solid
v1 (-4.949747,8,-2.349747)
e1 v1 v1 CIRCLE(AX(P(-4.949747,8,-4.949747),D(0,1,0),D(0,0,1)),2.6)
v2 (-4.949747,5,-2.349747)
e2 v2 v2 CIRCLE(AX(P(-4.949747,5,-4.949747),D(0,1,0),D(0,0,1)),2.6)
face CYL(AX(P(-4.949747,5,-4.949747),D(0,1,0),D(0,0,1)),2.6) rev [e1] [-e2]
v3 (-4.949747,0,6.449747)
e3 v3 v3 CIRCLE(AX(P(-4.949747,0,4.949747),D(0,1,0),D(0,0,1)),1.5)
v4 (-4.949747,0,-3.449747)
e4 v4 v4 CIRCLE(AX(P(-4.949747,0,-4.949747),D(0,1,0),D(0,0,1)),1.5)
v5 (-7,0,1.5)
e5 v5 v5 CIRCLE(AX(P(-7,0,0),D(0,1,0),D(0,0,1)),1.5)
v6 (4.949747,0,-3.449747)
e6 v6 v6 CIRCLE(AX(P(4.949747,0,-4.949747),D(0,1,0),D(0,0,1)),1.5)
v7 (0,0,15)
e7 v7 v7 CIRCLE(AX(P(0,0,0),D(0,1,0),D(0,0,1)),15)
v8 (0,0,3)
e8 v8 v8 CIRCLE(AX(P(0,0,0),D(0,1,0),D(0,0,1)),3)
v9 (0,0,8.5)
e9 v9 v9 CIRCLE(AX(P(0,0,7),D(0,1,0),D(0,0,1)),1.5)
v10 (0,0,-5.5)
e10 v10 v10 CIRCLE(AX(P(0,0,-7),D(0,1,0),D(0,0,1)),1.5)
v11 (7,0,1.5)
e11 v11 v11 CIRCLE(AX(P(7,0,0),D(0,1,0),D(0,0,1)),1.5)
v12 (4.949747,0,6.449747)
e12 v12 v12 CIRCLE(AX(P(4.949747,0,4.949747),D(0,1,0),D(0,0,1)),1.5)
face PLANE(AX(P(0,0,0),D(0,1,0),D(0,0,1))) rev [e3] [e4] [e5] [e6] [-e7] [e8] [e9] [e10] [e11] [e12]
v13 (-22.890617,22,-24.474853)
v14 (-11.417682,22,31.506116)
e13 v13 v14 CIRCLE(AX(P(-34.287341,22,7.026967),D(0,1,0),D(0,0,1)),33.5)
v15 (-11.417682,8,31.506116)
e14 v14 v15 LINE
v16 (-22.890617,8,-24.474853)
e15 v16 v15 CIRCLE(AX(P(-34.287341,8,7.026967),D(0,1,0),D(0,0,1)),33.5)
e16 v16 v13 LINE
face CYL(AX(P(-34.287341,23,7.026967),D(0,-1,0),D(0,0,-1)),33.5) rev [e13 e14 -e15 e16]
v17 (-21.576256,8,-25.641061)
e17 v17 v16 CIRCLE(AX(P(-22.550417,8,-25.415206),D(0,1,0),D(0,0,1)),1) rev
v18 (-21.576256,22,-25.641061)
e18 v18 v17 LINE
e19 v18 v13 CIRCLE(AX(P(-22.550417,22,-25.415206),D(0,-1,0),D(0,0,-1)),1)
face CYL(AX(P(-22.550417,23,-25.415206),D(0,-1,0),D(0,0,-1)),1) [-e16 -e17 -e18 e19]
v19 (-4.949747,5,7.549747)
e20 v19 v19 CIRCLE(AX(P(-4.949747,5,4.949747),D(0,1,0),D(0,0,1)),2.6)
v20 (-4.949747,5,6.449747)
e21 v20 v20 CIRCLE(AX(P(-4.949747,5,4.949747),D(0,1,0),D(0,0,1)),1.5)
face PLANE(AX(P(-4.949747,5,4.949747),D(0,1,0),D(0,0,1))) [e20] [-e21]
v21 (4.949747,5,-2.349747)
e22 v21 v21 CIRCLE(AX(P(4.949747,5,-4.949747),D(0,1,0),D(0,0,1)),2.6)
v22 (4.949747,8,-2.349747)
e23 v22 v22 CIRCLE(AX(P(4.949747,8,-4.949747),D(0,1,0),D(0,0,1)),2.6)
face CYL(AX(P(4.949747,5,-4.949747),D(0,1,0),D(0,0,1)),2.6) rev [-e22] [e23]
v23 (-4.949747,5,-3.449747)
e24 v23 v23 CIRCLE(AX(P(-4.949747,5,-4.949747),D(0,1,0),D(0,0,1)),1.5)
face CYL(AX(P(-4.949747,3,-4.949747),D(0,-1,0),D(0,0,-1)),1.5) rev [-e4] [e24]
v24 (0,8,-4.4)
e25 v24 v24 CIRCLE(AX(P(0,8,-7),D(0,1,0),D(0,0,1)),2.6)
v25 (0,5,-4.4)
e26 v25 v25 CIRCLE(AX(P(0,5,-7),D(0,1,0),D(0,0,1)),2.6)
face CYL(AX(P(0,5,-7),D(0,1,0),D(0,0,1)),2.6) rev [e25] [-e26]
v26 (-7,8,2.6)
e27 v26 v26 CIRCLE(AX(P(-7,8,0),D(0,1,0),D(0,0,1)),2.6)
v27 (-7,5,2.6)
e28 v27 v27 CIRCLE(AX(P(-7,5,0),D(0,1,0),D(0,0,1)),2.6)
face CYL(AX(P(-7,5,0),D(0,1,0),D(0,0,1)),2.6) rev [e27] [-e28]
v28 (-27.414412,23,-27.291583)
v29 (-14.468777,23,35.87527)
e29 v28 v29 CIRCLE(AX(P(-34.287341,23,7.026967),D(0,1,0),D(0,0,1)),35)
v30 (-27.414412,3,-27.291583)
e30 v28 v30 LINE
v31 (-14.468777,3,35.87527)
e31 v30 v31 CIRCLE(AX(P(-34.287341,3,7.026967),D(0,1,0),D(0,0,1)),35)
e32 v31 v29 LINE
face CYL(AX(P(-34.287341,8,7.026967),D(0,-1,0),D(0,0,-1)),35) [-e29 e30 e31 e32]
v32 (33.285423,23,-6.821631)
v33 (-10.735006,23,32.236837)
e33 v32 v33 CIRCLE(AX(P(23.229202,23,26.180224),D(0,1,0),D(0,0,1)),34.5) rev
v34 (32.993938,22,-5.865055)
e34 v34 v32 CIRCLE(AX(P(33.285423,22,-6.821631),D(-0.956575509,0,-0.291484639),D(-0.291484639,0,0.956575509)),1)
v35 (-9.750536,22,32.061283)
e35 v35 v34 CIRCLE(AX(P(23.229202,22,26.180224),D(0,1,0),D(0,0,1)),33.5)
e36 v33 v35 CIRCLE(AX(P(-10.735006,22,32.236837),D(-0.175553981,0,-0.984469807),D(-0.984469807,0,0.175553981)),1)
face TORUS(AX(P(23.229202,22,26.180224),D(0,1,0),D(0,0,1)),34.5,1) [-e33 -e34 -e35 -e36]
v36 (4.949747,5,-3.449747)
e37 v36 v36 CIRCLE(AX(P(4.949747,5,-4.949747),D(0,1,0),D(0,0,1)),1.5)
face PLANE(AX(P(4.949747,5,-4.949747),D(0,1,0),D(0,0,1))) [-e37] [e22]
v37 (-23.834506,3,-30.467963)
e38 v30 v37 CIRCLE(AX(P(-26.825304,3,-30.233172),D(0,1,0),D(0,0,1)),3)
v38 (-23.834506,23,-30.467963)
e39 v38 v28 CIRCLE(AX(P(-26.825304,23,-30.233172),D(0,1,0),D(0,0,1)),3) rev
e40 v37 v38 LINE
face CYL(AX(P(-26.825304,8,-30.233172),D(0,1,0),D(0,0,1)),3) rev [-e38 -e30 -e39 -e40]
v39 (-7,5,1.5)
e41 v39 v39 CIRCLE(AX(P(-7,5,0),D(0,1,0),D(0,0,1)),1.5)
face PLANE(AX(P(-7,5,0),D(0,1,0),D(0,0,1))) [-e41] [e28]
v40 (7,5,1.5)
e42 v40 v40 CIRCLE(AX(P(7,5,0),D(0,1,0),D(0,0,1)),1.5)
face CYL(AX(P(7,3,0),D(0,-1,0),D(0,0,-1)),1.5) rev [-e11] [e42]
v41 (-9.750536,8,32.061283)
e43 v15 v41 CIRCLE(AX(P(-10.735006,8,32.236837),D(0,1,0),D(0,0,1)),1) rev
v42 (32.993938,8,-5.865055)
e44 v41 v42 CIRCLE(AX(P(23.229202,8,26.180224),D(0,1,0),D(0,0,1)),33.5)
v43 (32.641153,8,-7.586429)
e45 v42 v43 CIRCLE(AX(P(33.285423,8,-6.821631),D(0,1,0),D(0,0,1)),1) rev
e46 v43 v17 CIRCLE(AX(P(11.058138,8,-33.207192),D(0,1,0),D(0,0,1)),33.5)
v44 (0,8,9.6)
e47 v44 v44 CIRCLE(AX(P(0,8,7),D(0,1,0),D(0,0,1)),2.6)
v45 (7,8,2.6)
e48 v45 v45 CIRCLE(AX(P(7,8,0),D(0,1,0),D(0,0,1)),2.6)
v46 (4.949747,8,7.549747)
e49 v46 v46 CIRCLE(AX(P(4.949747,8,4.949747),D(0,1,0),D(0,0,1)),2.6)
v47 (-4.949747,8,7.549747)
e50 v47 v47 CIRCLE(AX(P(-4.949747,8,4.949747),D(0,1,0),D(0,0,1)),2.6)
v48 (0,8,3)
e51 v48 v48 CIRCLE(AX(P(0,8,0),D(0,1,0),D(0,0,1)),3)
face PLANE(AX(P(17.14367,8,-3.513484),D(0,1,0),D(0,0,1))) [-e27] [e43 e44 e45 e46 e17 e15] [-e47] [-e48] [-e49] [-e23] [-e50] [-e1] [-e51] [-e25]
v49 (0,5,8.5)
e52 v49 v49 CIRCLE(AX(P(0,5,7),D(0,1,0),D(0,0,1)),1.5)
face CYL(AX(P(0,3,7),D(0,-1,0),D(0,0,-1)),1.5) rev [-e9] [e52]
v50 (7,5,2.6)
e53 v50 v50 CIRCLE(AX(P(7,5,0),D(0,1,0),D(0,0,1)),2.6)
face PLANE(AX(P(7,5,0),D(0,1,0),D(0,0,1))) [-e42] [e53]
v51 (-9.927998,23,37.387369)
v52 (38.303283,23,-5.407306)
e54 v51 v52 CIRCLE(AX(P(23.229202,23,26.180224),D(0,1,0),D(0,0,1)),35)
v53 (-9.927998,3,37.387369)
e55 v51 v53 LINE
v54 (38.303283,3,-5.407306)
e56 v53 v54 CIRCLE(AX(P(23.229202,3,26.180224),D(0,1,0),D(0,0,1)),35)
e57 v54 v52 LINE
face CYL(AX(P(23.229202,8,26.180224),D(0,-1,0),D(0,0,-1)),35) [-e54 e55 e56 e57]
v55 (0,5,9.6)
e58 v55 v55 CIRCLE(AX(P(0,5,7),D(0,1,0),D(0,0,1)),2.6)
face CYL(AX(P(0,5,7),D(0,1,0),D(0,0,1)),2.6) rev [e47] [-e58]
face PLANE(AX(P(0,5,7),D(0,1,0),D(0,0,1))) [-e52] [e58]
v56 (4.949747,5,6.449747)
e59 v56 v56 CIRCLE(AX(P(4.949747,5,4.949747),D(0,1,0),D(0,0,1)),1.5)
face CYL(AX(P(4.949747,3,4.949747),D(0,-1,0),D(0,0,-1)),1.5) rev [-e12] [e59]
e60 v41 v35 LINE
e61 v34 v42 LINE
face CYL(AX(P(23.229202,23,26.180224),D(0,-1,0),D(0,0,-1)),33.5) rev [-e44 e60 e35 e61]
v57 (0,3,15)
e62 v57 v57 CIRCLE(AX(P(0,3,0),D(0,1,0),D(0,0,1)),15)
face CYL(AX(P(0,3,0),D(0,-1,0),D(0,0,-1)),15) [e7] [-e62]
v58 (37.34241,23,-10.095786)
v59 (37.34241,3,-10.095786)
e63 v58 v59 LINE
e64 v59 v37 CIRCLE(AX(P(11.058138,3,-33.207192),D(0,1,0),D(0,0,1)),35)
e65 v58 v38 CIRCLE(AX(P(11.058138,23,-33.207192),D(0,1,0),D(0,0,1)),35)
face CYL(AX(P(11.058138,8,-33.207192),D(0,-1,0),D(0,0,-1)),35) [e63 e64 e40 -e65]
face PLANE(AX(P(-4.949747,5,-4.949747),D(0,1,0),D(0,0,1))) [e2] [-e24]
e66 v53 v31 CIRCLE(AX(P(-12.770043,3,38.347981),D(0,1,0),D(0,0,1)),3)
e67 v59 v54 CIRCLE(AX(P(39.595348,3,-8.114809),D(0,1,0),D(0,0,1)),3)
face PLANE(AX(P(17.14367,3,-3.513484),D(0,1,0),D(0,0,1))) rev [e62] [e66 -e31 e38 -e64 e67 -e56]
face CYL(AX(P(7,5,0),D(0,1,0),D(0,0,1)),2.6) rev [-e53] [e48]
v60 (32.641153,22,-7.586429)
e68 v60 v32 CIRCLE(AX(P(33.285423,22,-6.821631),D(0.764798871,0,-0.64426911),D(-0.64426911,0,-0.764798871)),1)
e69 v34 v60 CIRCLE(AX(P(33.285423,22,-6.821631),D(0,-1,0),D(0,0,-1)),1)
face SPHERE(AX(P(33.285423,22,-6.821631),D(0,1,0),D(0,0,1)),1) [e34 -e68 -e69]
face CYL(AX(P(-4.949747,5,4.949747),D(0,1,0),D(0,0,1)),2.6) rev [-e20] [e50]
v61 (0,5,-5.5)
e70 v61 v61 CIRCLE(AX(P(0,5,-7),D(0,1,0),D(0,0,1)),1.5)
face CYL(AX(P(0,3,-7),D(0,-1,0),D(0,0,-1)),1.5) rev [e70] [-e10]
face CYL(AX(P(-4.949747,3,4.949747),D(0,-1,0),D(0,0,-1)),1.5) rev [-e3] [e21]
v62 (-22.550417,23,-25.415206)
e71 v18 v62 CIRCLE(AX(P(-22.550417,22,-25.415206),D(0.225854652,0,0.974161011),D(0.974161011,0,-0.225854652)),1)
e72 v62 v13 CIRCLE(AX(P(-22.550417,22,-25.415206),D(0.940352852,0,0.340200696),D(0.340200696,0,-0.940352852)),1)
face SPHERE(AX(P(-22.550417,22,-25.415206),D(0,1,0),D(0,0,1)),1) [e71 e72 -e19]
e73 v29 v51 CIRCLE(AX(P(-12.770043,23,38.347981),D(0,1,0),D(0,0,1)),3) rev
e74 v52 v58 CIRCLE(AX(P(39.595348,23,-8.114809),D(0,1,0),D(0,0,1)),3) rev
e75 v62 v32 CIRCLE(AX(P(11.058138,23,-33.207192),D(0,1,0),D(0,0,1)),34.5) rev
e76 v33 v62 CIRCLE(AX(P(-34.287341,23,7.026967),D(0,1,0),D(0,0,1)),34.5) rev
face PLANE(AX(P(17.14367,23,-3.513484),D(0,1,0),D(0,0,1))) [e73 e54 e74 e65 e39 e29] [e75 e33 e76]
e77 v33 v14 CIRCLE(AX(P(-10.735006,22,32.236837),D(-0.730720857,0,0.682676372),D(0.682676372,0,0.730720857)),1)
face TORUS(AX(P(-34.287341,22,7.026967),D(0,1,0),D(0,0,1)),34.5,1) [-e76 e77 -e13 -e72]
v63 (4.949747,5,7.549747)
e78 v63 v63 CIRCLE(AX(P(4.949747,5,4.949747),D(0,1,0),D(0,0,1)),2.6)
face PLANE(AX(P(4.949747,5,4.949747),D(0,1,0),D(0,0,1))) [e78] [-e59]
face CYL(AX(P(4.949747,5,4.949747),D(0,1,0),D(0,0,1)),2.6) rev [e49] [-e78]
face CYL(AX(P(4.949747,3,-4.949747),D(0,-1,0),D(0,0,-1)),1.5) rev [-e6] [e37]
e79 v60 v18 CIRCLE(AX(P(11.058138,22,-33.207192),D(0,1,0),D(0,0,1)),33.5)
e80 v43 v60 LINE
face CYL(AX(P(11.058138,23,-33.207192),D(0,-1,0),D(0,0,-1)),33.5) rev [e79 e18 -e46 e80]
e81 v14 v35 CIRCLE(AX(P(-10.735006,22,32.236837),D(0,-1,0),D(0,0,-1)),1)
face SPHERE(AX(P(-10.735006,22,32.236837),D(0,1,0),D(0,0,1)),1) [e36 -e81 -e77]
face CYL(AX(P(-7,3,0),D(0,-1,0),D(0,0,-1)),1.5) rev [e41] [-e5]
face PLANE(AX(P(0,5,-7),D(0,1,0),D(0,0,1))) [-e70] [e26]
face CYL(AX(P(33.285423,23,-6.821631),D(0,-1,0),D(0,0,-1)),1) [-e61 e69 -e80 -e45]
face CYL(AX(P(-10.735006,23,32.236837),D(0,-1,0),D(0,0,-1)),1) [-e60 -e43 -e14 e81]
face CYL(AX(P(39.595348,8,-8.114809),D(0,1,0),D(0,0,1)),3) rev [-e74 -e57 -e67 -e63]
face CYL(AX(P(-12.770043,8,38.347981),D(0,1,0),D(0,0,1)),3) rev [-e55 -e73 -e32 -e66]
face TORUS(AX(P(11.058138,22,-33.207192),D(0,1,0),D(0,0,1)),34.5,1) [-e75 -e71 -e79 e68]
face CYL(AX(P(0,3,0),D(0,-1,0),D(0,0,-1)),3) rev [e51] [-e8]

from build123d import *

# Parameters (mm, degrees)
SKETCH_1_R          = 15
SKETCH_1_R_2        = 1.5
SKETCH_1_R_3        = 3
EXTRUDE_1_DEPTH     = 3
SKETCH_2_R          = 1.5
SKETCH_2_R_2        = 3
EXTRUDE_2_DEPTH     = 5
SKETCH_5_R          = 2.6
CUT_EXTRUDE_1_DEPTH = 3
EXTRUDE_3_DEPTH     = 15
FILLET_5_R          = 1
FILLET_6_R          = 1
FILLET_7_R          = 3


with BuildPart() as part:
    # 草图1 → 凸台-拉伸1 (new body)
    with BuildSketch(Plane(origin=(0, 0, 0), x_dir=(1, 0, 0), z_dir=(0, 1, 0))):
        with Locations(Location((0, 0, 0), (0, 0, 270))):
            Circle(SKETCH_1_R)
        with Locations(Location((0, 7, 0), (0, 0, 270))):
            Circle(SKETCH_1_R_2, mode=Mode.SUBTRACT)
        with Locations(Location((4.949747468, 4.949747468, 0), (0, 0, 270))):
            Circle(SKETCH_1_R_2, mode=Mode.SUBTRACT)
        with Locations(Location((7, 0, 0), (0, 0, 270))):
            Circle(SKETCH_1_R_2, mode=Mode.SUBTRACT)
        with Locations(Location((4.949747468, -4.949747468, 0), (0, 0, 270))):
            Circle(SKETCH_1_R_2, mode=Mode.SUBTRACT)
        with Locations(Location((0, -7, 0), (0, 0, 270))):
            Circle(SKETCH_1_R_2, mode=Mode.SUBTRACT)
        with Locations(Location((-4.949747468, -4.949747468, 0), (0, 0, 270))):
            Circle(SKETCH_1_R_2, mode=Mode.SUBTRACT)
        with Locations(Location((-7, 0, 0), (0, 0, 270))):
            Circle(SKETCH_1_R_2, mode=Mode.SUBTRACT)
        with Locations(Location((-4.949747468, 4.949747468, 0), (0, 0, 270))):
            Circle(SKETCH_1_R_2, mode=Mode.SUBTRACT)
        with Locations(Location((0, 0, 0), (0, 0, 270))):
            Circle(SKETCH_1_R_3, mode=Mode.SUBTRACT)
    extrude(amount=EXTRUDE_1_DEPTH)

    # 草图2 → 凸台-拉伸2 (add)
    with BuildSketch(Plane(origin=(0, 3, 0), x_dir=(1, 0, 0), z_dir=(0, 1, 0))):
        with BuildLine():
            ThreePointArc((34.287340692, 7.026967216), (22.116276452, 66.414383351), (-23.229202466, 26.18022446))
            ThreePointArc((-23.229202466, 26.18022446), (-68.574681385, -14.053934431), (-11.058138226, -33.207191676))
            ThreePointArc((-11.058138226, -33.207191676), (46.458404933, -52.36044892), (34.287340692, 7.026967216))
        make_face()
        with Locations(Location((-4.949747468, 4.949747468, 0), (0, 0, 270))):
            Circle(SKETCH_2_R, mode=Mode.SUBTRACT)
        with Locations(Location((-4.949747468, -4.949747468, 0), (0, 0, 270))):
            Circle(SKETCH_2_R, mode=Mode.SUBTRACT)
        with Locations(Location((0, -7, 0), (0, 0, 270))):
            Circle(SKETCH_2_R, mode=Mode.SUBTRACT)
        with Locations(Location((0, 0, 0), (0, 0, 270))):
            Circle(SKETCH_2_R_2, mode=Mode.SUBTRACT)
        with Locations(Location((-7, 0, 0), (0, 0, 270))):
            Circle(SKETCH_2_R, mode=Mode.SUBTRACT)
        with Locations(Location((4.949747468, -4.949747468, 0), (0, 0, 270))):
            Circle(SKETCH_2_R, mode=Mode.SUBTRACT)
        with Locations(Location((7, 0, 0), (0, 0, 270))):
            Circle(SKETCH_2_R, mode=Mode.SUBTRACT)
        with Locations(Location((4.949747468, 4.949747468, 0), (0, 0, 270))):
            Circle(SKETCH_2_R, mode=Mode.SUBTRACT)
        with Locations(Location((0, 7, 0), (0, 0, 270))):
            Circle(SKETCH_2_R, mode=Mode.SUBTRACT)
    extrude(amount=EXTRUDE_2_DEPTH)

    # 草图5 → 切除-拉伸1 (cut)
    with BuildSketch(Plane(origin=(0, 8, 0), x_dir=(1, 0, 0), z_dir=(0, 1, 0))):
        with Locations(Location((0, 7, 0), (0, 0, 270))):
            Circle(SKETCH_5_R)
        with Locations(Location((4.949747468, 4.949747468, 0), (0, 0, 270))):
            Circle(SKETCH_5_R)
        with Locations(Location((7, 0, 0), (0, 0, 270))):
            Circle(SKETCH_5_R)
        with Locations(Location((4.949747468, -4.949747468, 0), (0, 0, 270))):
            Circle(SKETCH_5_R)
        with Locations(Location((0, -7, 0), (0, 0, 270))):
            Circle(SKETCH_5_R)
        with Locations(Location((-4.949747468, -4.949747468, 0), (0, 0, 270))):
            Circle(SKETCH_5_R)
        with Locations(Location((-7, 0, 0), (0, 0, 270))):
            Circle(SKETCH_5_R)
        with Locations(Location((-4.949747468, 4.949747468, 0), (0, 0, 270))):
            Circle(SKETCH_5_R)
    extrude(amount=-CUT_EXTRUDE_1_DEPTH, mode=Mode.SUBTRACT)

    # 草图3 → 凸台-拉伸3 (add)
    with BuildSketch(Plane(origin=(0, 8, 0), x_dir=(1, 0, 0), z_dir=(0, 1, 0))):
        with BuildLine():
            ThreePointArc((34.287340692, 7.026967216), (22.116276452, 66.414383351), (-23.229202466, 26.18022446))
            ThreePointArc((-23.229202466, 26.18022446), (-68.574681385, -14.053934431), (-11.058138226, -33.207191676))
            ThreePointArc((-11.058138226, -33.207191676), (46.458404933, -52.36044892), (34.287340692, 7.026967216))
        make_face()
        with BuildLine():
            ThreePointArc((31.118546415, 6.377543462), (21.642356242, 64.991217994), (-21.08238786, 23.760679994))
            ThreePointArc((-21.08238786, 23.760679994), (-67.105223926, -13.752778694), (-10.036158556, -30.138223456))
            ThreePointArc((-10.036158556, -30.138223456), (45.462867684, -51.2384393), (31.118546415, 6.377543462))
        make_face(mode=Mode.SUBTRACT)
    extrude(amount=EXTRUDE_3_DEPTH)

    # 圆角5
    fillet_5_edges = [part.edges().sort_by_distance(p)[0] for p in [
        (31.118546415, 15.5, -6.377543462),
        (-21.08238786, 15.5, -23.760679994),
        (-10.036158556, 15.5, 30.138223456),
    ]]
    fillet(fillet_5_edges, radius=FILLET_5_R)

    # 圆角6
    fillet_6_edges = [part.edges().sort_by_distance(p)[0] for p in [
        (-67.105223926, 23, 13.752778694),
        (45.462867684, 23, 51.2384393),
        (21.642356242, 23, -64.991217994),
        (-21.886725168, 23, -24.667199764),
        (32.30578422, 23, -6.620860119),
        (-10.419059052, 23, 31.288059883),
    ]]
    fillet(fillet_6_edges, radius=FILLET_6_R - 0.0004)  # a hair under: the kernel refuses the full size

    # 圆角7
    fillet_7_edges = [part.edges().sort_by_distance(p)[0] for p in [
        (-11.058138226, 13, 33.207191676),
        (34.287340692, 13, -7.026967216),
        (-23.229202466, 13, -26.18022446),
    ]]
    fillet(fillet_7_edges, radius=FILLET_7_R)


solid = part.part
